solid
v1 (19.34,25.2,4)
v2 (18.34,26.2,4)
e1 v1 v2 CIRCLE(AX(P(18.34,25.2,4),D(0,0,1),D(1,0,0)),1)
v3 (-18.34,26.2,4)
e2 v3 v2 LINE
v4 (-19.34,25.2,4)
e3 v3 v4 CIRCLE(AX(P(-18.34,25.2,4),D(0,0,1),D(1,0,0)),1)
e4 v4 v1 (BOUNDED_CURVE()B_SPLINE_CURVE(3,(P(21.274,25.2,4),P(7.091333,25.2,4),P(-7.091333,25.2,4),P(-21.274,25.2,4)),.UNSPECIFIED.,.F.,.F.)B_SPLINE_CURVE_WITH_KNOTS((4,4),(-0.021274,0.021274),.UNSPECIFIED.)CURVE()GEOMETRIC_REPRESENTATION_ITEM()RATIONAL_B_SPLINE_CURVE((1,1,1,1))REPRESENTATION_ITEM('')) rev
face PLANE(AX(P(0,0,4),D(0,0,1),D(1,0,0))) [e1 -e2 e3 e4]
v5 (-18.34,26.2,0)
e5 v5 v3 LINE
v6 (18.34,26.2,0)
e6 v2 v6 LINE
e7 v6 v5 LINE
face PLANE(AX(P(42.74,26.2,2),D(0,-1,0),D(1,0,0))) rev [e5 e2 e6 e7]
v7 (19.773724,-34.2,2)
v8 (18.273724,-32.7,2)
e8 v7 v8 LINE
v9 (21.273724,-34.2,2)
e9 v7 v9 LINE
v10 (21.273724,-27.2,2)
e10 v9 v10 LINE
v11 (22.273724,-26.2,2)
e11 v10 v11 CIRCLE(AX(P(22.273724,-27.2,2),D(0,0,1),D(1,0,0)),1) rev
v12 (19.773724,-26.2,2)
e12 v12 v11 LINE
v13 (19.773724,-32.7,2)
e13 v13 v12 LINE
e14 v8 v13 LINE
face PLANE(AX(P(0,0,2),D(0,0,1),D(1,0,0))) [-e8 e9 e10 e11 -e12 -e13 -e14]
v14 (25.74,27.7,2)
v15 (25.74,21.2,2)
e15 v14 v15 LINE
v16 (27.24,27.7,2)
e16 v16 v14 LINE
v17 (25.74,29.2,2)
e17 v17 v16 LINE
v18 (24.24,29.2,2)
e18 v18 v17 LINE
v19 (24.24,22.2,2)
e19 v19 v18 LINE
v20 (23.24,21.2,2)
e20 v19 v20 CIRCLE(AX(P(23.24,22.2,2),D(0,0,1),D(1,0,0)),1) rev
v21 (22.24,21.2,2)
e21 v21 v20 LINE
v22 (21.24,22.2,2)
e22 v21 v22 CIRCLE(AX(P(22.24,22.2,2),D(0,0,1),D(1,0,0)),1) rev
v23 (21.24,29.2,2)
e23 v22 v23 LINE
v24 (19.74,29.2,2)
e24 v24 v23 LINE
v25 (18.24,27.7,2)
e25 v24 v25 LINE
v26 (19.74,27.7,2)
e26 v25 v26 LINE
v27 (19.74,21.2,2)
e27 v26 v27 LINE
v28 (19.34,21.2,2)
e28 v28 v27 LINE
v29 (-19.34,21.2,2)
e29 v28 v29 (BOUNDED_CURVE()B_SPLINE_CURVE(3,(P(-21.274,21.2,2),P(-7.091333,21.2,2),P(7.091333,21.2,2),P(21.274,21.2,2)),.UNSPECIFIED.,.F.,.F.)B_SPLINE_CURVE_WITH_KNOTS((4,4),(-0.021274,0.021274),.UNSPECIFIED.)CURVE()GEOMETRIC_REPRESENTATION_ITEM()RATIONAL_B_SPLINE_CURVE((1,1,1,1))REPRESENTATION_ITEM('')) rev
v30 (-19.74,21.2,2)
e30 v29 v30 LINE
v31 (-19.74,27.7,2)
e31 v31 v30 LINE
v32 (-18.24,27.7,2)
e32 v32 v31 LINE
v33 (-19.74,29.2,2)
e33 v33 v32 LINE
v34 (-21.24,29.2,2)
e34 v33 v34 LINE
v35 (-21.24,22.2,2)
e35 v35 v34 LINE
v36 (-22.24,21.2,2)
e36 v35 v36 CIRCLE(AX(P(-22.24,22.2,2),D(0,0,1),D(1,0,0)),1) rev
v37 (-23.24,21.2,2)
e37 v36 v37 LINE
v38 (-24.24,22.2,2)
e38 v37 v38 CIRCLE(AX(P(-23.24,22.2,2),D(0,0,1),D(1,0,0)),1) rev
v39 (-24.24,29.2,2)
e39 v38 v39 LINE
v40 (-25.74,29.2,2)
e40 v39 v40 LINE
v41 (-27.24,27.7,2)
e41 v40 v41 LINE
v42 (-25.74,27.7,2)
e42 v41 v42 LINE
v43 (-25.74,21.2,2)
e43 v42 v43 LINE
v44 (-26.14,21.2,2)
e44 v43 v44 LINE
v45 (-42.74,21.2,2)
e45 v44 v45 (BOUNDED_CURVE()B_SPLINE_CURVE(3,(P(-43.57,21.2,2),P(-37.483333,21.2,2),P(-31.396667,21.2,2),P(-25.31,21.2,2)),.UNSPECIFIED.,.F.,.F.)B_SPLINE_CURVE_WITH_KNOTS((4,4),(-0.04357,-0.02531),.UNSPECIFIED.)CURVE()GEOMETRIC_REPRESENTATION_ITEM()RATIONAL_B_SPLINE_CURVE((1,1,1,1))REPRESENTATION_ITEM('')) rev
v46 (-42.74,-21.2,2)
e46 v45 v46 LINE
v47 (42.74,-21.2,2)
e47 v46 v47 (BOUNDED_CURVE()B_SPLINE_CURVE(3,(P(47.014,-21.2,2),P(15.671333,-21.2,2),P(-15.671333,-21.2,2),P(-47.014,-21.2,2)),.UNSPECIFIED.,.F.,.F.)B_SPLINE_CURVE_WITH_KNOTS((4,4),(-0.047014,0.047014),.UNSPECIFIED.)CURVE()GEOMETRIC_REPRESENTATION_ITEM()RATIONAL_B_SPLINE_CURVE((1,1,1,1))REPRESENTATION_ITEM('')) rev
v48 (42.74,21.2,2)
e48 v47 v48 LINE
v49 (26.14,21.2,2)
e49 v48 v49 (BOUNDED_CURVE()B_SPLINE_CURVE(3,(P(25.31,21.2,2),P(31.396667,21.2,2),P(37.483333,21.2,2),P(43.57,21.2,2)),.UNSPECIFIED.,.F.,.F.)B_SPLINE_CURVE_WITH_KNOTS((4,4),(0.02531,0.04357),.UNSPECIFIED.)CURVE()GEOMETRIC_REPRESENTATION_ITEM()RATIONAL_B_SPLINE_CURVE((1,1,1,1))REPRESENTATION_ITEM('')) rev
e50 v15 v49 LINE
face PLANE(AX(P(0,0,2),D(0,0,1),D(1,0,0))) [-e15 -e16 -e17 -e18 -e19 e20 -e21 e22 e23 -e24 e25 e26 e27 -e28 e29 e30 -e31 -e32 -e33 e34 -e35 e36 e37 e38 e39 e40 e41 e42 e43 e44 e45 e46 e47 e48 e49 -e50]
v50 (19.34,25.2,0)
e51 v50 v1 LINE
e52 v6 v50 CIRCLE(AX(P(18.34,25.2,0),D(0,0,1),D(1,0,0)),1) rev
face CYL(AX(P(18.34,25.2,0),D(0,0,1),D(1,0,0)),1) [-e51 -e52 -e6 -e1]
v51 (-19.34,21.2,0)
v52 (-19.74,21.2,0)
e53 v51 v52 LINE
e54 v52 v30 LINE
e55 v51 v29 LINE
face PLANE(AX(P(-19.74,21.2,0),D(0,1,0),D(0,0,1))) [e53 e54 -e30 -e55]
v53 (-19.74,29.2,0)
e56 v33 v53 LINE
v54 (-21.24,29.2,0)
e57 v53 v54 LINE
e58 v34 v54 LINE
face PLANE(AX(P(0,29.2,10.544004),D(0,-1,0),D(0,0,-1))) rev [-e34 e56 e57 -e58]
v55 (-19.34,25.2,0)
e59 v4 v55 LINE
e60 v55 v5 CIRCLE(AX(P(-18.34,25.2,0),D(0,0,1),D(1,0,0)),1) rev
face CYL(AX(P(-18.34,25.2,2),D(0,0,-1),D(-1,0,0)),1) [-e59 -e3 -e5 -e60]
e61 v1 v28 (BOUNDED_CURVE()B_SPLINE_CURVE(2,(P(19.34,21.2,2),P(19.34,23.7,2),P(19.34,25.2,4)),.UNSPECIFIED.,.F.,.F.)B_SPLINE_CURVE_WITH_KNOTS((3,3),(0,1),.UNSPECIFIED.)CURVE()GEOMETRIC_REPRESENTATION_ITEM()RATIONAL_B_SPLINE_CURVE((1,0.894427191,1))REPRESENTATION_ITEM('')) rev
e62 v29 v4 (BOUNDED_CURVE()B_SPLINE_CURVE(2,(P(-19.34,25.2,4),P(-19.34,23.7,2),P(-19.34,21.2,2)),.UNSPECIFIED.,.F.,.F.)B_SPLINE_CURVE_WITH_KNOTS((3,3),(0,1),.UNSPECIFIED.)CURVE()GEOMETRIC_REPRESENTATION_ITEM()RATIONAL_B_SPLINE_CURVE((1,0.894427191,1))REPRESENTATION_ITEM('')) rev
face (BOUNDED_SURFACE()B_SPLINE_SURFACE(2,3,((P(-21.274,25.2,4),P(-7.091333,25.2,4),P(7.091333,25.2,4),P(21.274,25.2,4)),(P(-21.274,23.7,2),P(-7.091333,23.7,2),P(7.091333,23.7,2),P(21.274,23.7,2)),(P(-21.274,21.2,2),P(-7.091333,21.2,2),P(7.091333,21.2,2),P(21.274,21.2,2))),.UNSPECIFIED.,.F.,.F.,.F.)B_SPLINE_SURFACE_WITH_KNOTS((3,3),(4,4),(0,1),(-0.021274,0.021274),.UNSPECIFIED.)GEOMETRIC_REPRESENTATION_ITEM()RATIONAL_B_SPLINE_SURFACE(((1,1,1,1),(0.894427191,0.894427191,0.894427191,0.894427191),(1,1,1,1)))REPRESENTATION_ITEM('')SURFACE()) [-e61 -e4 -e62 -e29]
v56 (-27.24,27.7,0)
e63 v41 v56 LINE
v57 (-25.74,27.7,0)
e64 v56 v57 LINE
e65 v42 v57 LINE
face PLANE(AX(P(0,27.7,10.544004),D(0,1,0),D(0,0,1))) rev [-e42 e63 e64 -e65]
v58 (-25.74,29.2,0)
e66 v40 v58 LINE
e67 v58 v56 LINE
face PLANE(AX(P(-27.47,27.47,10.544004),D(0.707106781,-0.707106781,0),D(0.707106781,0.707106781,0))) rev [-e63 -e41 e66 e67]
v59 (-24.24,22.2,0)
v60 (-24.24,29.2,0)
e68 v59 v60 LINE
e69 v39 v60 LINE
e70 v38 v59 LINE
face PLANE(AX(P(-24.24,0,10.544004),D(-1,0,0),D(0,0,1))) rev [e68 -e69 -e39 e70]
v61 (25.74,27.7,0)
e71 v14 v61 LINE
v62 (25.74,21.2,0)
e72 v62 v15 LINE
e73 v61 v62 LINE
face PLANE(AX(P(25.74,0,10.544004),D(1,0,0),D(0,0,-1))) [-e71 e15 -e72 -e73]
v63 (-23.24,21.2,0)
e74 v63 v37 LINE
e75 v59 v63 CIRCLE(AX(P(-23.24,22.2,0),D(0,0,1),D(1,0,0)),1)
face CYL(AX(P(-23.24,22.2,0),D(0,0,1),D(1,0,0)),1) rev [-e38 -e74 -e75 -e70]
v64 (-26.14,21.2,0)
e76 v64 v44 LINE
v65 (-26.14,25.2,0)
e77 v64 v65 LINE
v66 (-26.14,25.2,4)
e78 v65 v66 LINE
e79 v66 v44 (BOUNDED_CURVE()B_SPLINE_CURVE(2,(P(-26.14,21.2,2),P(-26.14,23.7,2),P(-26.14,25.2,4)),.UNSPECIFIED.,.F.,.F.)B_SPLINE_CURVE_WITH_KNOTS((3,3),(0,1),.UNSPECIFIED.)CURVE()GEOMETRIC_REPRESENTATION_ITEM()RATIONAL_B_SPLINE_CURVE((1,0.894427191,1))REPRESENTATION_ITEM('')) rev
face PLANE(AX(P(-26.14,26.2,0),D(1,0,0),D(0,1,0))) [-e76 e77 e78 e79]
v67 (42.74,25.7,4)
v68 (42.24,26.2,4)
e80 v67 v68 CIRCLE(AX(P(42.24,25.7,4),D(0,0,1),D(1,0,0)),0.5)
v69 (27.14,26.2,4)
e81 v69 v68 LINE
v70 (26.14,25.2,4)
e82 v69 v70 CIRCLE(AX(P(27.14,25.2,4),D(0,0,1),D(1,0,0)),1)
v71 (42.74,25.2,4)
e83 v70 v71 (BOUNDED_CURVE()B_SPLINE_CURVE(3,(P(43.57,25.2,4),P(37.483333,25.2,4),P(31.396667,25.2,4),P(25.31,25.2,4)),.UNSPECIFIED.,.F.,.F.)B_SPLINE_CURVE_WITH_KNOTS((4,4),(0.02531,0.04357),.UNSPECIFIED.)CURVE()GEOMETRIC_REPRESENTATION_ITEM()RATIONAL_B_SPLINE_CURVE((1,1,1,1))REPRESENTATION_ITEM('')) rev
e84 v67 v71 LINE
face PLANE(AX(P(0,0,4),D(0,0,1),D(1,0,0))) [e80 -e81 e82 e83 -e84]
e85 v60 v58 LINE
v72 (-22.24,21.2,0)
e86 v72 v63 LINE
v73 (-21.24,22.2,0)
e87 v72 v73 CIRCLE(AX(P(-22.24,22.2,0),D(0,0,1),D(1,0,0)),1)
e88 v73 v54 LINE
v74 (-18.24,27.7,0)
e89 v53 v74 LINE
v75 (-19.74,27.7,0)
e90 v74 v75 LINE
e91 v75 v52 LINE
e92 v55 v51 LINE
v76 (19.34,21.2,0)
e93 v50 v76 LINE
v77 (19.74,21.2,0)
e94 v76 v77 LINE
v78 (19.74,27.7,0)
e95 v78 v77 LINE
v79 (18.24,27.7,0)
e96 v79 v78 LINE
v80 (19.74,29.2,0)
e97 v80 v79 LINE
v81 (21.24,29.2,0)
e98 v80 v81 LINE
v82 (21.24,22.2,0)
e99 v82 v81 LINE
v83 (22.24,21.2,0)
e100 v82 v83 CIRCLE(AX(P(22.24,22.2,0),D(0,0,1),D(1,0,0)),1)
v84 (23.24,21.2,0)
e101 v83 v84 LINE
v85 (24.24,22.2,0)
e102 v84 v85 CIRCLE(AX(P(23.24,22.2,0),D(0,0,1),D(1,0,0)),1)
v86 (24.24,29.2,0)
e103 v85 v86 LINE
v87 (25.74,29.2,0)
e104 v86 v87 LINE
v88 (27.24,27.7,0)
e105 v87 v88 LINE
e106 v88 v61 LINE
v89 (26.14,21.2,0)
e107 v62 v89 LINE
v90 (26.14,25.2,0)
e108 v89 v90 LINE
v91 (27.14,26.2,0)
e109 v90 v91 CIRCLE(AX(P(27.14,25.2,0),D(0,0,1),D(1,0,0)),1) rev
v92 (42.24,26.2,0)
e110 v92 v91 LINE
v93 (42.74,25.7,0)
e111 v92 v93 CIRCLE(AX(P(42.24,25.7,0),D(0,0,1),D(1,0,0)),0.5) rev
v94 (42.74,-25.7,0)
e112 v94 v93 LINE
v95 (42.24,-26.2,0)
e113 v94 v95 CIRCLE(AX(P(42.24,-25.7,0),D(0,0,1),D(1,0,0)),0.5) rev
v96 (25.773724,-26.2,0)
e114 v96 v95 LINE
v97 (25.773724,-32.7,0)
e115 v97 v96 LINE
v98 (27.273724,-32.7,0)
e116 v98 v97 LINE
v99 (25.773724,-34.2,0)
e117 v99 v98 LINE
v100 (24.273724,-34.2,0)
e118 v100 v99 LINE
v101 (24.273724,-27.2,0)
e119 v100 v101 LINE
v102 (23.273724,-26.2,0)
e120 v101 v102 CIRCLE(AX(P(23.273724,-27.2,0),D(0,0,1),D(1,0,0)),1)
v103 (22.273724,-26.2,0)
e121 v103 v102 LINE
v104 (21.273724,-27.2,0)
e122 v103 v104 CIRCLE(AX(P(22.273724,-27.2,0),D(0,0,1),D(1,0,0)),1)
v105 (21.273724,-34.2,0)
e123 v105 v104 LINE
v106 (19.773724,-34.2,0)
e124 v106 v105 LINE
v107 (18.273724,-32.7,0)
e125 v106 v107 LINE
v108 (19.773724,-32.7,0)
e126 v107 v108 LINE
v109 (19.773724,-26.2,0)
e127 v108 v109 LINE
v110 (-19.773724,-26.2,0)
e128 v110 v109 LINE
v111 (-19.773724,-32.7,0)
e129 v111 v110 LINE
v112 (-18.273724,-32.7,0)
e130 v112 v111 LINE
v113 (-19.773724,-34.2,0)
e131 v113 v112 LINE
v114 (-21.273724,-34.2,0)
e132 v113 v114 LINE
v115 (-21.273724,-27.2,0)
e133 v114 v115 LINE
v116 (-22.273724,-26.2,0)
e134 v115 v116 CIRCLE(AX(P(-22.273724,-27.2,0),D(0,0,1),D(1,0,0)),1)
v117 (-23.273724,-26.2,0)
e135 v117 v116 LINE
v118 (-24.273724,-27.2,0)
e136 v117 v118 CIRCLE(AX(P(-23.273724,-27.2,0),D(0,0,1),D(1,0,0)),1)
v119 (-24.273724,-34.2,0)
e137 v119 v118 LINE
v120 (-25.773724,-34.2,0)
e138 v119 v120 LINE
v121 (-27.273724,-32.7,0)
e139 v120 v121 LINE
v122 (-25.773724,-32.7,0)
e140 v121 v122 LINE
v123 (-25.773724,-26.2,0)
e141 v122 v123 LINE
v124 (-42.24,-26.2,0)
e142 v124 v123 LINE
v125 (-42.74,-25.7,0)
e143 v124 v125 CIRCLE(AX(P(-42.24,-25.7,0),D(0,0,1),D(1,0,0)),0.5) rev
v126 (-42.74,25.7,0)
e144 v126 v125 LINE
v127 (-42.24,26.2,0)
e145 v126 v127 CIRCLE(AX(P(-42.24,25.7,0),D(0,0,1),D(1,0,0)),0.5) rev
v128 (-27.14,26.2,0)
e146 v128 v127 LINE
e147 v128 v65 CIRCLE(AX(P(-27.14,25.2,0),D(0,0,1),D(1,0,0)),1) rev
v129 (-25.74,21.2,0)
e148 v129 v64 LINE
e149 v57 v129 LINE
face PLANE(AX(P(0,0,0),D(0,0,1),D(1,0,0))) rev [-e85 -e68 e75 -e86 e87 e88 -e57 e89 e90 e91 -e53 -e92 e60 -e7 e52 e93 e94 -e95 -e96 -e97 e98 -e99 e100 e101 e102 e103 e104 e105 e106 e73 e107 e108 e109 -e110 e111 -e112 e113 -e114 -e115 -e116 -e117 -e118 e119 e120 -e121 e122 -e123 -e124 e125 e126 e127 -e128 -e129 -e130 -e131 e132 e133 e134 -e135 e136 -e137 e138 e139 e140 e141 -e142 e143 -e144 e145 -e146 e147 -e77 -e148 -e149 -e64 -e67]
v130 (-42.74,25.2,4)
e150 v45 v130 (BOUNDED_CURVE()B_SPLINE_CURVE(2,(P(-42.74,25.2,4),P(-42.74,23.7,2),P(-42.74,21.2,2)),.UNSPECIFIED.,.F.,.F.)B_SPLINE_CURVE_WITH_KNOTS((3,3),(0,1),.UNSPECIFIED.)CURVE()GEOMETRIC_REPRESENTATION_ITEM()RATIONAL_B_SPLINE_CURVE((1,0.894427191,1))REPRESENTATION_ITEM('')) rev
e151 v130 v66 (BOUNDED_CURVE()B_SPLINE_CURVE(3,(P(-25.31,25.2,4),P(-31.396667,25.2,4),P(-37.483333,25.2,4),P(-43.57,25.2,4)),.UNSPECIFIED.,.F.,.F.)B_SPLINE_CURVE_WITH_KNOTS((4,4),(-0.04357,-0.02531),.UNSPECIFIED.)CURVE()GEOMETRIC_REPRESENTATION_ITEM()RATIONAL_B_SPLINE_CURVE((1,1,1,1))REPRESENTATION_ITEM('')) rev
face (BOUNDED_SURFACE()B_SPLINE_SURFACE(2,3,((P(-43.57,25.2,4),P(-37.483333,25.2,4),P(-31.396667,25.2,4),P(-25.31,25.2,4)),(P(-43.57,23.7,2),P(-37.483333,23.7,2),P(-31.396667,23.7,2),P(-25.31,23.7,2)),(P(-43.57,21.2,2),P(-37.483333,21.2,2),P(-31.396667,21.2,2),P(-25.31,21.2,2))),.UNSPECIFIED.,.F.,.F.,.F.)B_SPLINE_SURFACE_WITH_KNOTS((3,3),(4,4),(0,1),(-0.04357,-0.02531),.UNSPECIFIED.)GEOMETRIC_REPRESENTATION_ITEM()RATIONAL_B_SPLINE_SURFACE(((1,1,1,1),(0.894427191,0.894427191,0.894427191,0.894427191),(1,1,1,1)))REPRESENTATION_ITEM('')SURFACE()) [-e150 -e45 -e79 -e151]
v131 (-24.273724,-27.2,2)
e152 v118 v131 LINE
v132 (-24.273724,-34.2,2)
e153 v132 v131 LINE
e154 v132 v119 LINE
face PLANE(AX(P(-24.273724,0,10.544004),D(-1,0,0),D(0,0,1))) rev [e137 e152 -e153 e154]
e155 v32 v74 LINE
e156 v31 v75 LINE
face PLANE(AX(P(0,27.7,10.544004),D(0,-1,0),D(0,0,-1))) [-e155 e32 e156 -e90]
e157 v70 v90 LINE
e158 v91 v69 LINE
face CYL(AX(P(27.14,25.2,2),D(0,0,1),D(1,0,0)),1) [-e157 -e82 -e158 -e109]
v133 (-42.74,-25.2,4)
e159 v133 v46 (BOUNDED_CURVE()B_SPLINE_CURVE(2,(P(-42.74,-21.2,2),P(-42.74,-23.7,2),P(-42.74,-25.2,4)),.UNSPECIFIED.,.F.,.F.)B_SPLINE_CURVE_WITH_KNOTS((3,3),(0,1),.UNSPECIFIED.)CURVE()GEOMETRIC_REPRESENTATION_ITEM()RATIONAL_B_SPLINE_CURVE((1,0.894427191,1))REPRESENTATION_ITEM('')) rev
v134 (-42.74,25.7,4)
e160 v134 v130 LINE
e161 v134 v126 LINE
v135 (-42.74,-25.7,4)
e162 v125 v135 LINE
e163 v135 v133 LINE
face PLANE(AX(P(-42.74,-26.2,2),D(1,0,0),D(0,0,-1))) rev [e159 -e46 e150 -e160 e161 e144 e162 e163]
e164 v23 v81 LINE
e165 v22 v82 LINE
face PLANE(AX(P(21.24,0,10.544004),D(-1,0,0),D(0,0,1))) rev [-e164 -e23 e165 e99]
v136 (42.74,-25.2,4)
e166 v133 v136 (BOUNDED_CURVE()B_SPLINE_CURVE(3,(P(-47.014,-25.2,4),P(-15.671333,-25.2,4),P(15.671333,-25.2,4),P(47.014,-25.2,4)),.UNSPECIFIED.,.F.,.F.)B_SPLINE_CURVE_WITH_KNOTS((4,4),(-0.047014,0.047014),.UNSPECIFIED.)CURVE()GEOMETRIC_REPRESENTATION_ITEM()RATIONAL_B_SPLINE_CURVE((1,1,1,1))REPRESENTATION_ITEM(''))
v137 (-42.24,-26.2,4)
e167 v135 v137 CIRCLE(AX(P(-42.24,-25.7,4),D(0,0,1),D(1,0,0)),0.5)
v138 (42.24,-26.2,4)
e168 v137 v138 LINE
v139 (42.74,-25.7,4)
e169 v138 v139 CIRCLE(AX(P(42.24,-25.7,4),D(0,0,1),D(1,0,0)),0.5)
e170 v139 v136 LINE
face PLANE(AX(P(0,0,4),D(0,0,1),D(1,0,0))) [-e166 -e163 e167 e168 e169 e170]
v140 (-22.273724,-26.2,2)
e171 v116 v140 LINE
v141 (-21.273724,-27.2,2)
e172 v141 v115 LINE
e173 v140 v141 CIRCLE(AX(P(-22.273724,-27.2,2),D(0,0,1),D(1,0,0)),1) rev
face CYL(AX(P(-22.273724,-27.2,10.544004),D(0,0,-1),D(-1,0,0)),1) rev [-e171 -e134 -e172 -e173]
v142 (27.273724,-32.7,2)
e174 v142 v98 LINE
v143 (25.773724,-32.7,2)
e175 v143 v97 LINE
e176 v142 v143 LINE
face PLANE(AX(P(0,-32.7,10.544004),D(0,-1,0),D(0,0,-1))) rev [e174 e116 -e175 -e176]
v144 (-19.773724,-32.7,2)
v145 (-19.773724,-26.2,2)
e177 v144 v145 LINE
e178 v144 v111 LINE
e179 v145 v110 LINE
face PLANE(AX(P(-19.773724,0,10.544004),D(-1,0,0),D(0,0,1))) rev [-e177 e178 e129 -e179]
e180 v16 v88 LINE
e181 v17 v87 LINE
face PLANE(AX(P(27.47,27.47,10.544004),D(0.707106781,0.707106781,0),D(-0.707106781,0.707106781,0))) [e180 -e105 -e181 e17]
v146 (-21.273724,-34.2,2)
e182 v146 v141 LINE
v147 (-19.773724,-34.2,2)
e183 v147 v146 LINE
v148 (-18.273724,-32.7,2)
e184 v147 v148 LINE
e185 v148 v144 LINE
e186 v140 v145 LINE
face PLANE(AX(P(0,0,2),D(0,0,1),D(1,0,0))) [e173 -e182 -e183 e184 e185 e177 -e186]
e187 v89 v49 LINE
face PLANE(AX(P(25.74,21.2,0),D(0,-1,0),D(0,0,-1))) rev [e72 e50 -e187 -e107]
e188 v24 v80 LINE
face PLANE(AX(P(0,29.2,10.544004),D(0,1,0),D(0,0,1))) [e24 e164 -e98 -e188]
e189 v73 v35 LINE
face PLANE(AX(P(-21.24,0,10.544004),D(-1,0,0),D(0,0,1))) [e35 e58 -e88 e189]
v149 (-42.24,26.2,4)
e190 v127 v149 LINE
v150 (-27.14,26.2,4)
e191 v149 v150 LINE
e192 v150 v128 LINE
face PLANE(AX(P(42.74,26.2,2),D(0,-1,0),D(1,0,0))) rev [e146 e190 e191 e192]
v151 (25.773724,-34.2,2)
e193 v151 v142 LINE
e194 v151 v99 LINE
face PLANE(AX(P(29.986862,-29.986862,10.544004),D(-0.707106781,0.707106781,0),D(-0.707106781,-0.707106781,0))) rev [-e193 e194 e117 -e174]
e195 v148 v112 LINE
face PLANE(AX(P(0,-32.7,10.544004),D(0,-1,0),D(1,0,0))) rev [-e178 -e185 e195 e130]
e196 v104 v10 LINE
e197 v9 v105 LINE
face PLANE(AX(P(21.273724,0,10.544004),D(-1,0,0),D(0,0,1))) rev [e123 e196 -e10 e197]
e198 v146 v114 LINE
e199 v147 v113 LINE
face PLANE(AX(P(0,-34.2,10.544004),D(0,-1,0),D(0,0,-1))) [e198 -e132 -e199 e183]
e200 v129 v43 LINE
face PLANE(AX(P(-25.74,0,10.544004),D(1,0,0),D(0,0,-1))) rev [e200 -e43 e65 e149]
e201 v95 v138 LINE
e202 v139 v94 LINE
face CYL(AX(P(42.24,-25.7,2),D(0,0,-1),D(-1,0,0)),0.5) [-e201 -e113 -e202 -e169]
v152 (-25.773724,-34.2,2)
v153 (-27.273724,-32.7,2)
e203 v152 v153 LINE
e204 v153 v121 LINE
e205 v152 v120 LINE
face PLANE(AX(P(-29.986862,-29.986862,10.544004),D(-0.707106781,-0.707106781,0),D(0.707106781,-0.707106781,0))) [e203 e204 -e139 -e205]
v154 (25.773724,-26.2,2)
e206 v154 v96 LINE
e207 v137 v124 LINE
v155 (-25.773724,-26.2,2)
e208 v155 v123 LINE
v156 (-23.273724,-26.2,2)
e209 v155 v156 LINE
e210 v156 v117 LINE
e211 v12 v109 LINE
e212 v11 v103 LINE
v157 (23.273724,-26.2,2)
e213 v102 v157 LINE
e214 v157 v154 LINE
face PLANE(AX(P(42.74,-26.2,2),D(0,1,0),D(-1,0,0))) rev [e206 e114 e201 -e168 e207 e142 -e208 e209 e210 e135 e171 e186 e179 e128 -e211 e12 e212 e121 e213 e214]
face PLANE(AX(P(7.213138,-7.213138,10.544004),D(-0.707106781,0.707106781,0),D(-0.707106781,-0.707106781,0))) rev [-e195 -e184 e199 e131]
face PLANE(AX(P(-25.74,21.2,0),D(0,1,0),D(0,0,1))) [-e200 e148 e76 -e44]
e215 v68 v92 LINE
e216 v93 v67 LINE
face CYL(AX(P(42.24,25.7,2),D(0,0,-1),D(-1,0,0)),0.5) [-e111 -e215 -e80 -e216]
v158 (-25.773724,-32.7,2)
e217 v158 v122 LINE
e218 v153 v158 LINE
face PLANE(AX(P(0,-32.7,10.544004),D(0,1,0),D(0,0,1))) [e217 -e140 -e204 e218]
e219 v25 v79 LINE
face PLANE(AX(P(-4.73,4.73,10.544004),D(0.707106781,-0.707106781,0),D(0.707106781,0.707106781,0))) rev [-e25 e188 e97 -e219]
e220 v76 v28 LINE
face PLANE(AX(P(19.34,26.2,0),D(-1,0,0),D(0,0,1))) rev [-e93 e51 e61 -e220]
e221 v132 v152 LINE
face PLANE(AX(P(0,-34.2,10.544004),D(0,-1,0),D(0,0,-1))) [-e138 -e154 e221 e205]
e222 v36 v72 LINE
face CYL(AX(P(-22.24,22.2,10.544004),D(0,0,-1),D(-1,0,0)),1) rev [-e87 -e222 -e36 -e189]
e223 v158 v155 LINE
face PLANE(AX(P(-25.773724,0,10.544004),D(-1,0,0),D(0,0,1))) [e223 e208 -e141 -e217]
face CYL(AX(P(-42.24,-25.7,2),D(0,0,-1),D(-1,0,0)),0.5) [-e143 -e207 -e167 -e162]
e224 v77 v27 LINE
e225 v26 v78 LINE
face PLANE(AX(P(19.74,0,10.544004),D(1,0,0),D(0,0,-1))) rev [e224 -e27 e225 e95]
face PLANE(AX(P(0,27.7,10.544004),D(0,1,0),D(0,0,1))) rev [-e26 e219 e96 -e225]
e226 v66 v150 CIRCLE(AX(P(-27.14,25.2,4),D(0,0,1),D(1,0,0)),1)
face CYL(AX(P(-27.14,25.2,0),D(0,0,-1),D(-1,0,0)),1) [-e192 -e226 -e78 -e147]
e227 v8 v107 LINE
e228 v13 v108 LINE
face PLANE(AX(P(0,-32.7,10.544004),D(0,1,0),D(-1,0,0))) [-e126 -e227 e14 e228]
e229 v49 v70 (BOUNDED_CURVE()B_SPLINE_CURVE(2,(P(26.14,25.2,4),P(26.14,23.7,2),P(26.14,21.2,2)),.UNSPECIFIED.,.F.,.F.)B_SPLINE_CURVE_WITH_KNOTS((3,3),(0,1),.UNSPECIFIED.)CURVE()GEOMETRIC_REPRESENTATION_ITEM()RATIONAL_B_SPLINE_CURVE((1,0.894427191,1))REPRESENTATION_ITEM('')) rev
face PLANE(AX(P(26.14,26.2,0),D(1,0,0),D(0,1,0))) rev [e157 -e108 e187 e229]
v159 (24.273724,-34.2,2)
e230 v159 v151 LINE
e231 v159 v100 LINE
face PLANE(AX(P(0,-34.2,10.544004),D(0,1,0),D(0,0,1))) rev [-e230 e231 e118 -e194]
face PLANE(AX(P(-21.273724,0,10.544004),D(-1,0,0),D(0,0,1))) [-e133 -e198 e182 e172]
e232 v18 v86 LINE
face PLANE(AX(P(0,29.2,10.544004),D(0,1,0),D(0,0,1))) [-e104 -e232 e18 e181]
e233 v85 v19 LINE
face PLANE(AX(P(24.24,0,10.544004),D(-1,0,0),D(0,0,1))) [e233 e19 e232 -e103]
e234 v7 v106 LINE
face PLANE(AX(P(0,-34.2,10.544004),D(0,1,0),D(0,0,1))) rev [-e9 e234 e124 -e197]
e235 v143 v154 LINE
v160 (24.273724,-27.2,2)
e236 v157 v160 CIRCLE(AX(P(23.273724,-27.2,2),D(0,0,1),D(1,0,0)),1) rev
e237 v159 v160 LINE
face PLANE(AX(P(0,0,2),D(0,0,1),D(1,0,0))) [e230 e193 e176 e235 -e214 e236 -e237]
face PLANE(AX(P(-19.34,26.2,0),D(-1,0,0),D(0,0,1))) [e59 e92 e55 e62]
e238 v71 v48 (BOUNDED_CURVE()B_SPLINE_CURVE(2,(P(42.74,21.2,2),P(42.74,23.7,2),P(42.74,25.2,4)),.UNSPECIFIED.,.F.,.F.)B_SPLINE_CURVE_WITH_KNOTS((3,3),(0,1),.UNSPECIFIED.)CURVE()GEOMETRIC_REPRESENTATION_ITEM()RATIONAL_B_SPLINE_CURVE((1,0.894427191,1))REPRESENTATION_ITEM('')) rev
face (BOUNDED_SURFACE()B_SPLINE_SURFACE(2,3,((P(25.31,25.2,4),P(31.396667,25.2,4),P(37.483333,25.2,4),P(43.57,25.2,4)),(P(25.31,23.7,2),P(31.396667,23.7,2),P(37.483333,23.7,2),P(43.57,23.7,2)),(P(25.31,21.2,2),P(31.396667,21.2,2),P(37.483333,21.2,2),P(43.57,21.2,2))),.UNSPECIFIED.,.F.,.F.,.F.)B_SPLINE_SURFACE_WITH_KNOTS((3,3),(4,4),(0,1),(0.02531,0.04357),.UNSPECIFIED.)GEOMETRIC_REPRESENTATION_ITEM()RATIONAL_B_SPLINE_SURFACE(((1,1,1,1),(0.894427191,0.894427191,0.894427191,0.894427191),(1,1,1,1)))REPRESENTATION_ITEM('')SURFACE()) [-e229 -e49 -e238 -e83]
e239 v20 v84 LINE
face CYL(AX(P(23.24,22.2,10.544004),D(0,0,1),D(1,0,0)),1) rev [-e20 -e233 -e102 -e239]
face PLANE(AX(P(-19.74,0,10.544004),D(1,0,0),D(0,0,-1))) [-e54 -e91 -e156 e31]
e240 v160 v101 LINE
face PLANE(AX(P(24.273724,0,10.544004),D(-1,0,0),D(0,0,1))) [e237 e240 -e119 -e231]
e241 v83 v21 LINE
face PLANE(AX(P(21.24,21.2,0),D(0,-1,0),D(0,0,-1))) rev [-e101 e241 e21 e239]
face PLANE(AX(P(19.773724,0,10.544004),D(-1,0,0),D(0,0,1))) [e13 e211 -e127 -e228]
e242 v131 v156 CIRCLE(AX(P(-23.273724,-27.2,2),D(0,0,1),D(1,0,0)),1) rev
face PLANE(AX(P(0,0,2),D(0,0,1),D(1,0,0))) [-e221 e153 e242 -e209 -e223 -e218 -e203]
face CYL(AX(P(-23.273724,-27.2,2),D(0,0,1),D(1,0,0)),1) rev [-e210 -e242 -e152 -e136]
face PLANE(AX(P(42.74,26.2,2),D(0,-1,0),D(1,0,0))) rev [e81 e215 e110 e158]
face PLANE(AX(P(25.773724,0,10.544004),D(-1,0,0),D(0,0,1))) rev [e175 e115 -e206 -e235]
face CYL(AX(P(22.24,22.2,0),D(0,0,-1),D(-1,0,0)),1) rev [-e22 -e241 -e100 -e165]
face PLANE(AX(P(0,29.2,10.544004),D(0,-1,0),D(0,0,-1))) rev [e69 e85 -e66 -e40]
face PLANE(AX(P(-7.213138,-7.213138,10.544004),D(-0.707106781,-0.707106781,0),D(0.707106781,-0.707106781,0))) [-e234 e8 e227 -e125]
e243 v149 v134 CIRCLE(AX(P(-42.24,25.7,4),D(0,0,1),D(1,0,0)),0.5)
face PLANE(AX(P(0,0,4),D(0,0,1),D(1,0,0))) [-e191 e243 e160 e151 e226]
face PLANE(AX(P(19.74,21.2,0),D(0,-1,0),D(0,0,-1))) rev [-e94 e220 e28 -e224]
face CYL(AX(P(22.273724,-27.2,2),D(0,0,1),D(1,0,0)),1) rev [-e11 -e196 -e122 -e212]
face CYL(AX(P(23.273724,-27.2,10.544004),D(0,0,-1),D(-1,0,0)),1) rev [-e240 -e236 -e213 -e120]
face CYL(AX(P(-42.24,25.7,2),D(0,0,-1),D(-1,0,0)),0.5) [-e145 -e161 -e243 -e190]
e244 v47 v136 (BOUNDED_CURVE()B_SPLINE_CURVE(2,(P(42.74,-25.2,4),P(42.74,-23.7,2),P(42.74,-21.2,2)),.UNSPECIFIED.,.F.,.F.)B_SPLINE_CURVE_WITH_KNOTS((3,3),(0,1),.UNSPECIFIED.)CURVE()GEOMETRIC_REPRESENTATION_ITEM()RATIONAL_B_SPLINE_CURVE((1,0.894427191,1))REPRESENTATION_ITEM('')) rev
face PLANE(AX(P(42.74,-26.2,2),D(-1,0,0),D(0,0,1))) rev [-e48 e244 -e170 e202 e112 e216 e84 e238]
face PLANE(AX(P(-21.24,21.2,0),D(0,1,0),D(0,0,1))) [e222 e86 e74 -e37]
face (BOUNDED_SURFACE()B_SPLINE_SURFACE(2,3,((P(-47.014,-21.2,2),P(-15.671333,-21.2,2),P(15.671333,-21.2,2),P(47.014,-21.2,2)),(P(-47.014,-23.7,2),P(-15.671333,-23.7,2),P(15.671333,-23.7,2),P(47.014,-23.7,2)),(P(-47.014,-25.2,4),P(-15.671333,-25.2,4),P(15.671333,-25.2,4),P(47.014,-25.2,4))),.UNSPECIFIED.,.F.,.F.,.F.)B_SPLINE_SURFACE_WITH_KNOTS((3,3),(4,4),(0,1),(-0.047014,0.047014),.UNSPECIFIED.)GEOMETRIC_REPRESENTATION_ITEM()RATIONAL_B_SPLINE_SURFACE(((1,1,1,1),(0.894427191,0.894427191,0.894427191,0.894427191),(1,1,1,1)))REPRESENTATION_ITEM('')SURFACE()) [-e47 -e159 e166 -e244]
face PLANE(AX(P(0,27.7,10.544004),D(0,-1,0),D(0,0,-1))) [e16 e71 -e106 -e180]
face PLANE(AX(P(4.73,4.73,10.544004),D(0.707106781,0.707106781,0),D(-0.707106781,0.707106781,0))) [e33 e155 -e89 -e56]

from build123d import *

# Parameters (mm, degrees)
SKETCH1_W            = 85.48
SKETCH1_H            = 52.4
BOSS_EXTRUDE1_DEPTH  = 2
BOSS_EXTRUDE2_DEPTH  = 2
SKETCH7_W            = 3
SKETCH7_H            = 5
SKETCH7_W_2          = 0.4
CUT_EXTRUDE2_DEPTH   = 55.775428798
FILLET4_R            = 1
FILLET4_OF_MIRROR2_R = 1
SKETCH8_W            = 85.48
SKETCH8_H            = 1
BOSS_EXTRUDE4_DEPTH  = 2
FILLET5_START        = -42.74
FILLET5_DEPTH        = 85.48
FILLET5_START_2      = -19.34
FILLET5_2_DEPTH      = 38.68
FILLET5_3_DEPTH      = 16.6
FILLET5_START_3      = 26.14
FILLET5_4_DEPTH      = 16.6
FILLET6_R            = 0.5


with BuildPart() as part:
    # Sketch1 → Boss-Extrude1 (new body)
    with BuildSketch(Plane.XY):
        Rectangle(SKETCH1_W, SKETCH1_H)
    extrude(amount=BOSS_EXTRUDE1_DEPTH)

    # Sketch2 → Boss-Extrude2 (add)
    with BuildSketch(Plane(origin=(0, 0, 0), x_dir=(-1, 0, 0), z_dir=(0, 0, -1))):
        Polygon((-27.24, 27.7), (-25.74, 27.7), (-25.74, 26.2), (-24.24, 26.2), (-24.24, 29.2), (-25.74, 29.2), align=None)
        Polygon((-19.74, 29.2), (-21.24, 29.2), (-21.24, 26.2), (-19.74, 26.2), (-19.74, 27.7), (-18.24, 27.7), align=None)
        Polygon((-25.773724333, -26.2), (-25.773724333, -32.7), (-27.273724333, -32.7), (-25.773724333, -34.2), (-24.273724333, -34.2), (-24.273724333, -26.2), align=None)
        Polygon((-21.273724333, -26.2), (-21.273724333, -34.2), (-19.773724333, -34.2), (-18.273724333, -32.7), (-19.773724333, -32.7), (-19.773724333, -26.2), align=None)
    boss_extrude2 = extrude(amount=-BOSS_EXTRUDE2_DEPTH)

    # Sketch7 → Cut-Extrude2 (cut, through all)
    with BuildSketch(Plane.XY.offset(2)):
        with Locations((22.74, 23.7)):
            Rectangle(SKETCH7_W, SKETCH7_H)
        with Locations((19.54, 23.7)):
            Rectangle(SKETCH7_W_2, SKETCH7_H)
        with Locations((25.94, 23.7)):
            Rectangle(SKETCH7_W_2, SKETCH7_H)
    cut_extrude2 = extrude(amount=-CUT_EXTRUDE2_DEPTH, mode=Mode.SUBTRACT)

    # Fillet4
    fillet4_edges = [part.edges().sort_by_distance(p)[0] for p in [
        (19.34, 26.2, 1),
        (21.24, 21.2, 1),
        (24.24, 21.2, 1),
        (24.273724333, -26.2, 1),
        (21.273724333, -26.2, 1),
        (26.14, 26.2, 1),
    ]]
    fillet(fillet4_edges, radius=FILLET4_R)

    # Mirror2: Boss-Extrude2, Cut-Extrude2 across plane
    add(boss_extrude2.mirror(Plane(origin=(0, 0, 0), x_dir=(0, 0, 1), z_dir=(1, 0, 0))))
    add(cut_extrude2.mirror(Plane(origin=(0, 0, 0), x_dir=(0, 0, 1), z_dir=(1, 0, 0))), mode=Mode.SUBTRACT)

    # Fillet4 of Mirror2
    fillet4_of_mirror2_edges = [part.edges().sort_by_distance(p)[0] for p in [
        (-19.34, 26.2, 1),
        (-21.24, 21.2, 1),
        (-24.24, 21.2, 1),
        (-24.273724333, -26.2, 1),
        (-21.273724333, -26.2, 1),
        (-26.14, 26.2, 1),
    ]]
    fillet(fillet4_of_mirror2_edges, radius=FILLET4_OF_MIRROR2_R)

    # Sketch8 → Boss-Extrude4 (add)
    with BuildSketch(Plane.XY.offset(2)):
        with BuildLine():
            Line((-42.74, 26.2), (-42.74, 25.2))
            Line((-42.74, 25.2), (-26.14, 25.2))
            ThreePointArc((-26.14, 25.2), (-26.432893219, 25.907106781), (-27.14, 26.2))
            Line((-27.14, 26.2), (-42.74, 26.2))
        make_face()
        with BuildLine():
            ThreePointArc((-18.34, 26.2), (-19.047106781, 25.907106781), (-19.34, 25.2))
            Line((-19.34, 25.2), (19.34, 25.2))
            ThreePointArc((19.34, 25.2), (19.047106781, 25.907106781), (18.34, 26.2))
            Line((18.34, 26.2), (-18.34, 26.2))
        make_face()
        with BuildLine():
            Line((26.14, 25.2), (42.74, 25.2))
            Line((42.74, 25.2), (42.74, 26.2))
            Line((42.74, 26.2), (27.14, 26.2))
            ThreePointArc((27.14, 26.2), (26.432893219, 25.907106781), (26.14, 25.2))
        make_face()
        with Locations((0, -25.7)):
            Rectangle(SKETCH8_W, SKETCH8_H)
    extrude(amount=BOSS_EXTRUDE4_DEPTH)

    # Fillet5: read off the stored shape, not the designer's step
    # Fillet5 outline → Fillet5 (add)
    with BuildSketch(Plane.YZ.offset(FILLET5_START)):
        with BuildLine():
            Line((-25.2, 2), (-21.2, 2))
            add(Edge.make_bspline(
                [(-21.2, 2), (-23.7, 2), (-25.2, 4)],
                knots=[0, 0, 0, 1, 1, 1], degree=2, weights=[1, 0.894427191, 1]))
            Line((-25.2, 4), (-25.2, 2))
        make_face()
    extrude(amount=FILLET5_DEPTH)

    # Fillet5 2 outline → Fillet5 2 (add)
    with BuildSketch(Plane.YZ.offset(FILLET5_START_2)):
        with BuildLine():
            add(Edge.make_bspline(
                [(25.2, 4), (23.7, 2), (21.2, 2)],
                knots=[0, 0, 0, 1, 1, 1], degree=2, weights=[1, 0.894427191, 1]))
            Line((21.2, 2), (25.2, 2))
            Line((25.2, 2), (25.2, 4))
        make_face()
    extrude(amount=FILLET5_2_DEPTH)

    # Fillet5 3 outline → Fillet5 3 (add)
    with BuildSketch(Plane.YZ.offset(FILLET5_START)):
        with BuildLine():
            add(Edge.make_bspline(
                [(25.2, 4), (23.7, 2), (21.2, 2)],
                knots=[0, 0, 0, 1, 1, 1], degree=2, weights=[1, 0.894427191, 1]))
            Line((21.2, 2), (25.2, 2))
            Line((25.2, 2), (25.2, 4))
        make_face()
    extrude(amount=FILLET5_3_DEPTH)

    # Fillet5 4 outline → Fillet5 4 (add)
    with BuildSketch(Plane.YZ.offset(FILLET5_START_3)):
        with BuildLine():
            add(Edge.make_bspline(
                [(25.2, 4), (23.7, 2), (21.2, 2)],
                knots=[0, 0, 0, 1, 1, 1], degree=2, weights=[1, 0.894427191, 1]))
            Line((21.2, 2), (25.2, 2))
            Line((25.2, 2), (25.2, 4))
        make_face()
    extrude(amount=FILLET5_4_DEPTH)

    # Fillet6
    fillet6_edges = [part.edges().sort_by_distance(p)[0] for p in [
        (-42.74, 26.2, 2),
        (42.74, 26.2, 2),
        (42.74, -26.2, 2),
        (-42.74, -26.2, 2),
    ]]
    fillet(fillet6_edges, radius=FILLET6_R)


solid = part.part
